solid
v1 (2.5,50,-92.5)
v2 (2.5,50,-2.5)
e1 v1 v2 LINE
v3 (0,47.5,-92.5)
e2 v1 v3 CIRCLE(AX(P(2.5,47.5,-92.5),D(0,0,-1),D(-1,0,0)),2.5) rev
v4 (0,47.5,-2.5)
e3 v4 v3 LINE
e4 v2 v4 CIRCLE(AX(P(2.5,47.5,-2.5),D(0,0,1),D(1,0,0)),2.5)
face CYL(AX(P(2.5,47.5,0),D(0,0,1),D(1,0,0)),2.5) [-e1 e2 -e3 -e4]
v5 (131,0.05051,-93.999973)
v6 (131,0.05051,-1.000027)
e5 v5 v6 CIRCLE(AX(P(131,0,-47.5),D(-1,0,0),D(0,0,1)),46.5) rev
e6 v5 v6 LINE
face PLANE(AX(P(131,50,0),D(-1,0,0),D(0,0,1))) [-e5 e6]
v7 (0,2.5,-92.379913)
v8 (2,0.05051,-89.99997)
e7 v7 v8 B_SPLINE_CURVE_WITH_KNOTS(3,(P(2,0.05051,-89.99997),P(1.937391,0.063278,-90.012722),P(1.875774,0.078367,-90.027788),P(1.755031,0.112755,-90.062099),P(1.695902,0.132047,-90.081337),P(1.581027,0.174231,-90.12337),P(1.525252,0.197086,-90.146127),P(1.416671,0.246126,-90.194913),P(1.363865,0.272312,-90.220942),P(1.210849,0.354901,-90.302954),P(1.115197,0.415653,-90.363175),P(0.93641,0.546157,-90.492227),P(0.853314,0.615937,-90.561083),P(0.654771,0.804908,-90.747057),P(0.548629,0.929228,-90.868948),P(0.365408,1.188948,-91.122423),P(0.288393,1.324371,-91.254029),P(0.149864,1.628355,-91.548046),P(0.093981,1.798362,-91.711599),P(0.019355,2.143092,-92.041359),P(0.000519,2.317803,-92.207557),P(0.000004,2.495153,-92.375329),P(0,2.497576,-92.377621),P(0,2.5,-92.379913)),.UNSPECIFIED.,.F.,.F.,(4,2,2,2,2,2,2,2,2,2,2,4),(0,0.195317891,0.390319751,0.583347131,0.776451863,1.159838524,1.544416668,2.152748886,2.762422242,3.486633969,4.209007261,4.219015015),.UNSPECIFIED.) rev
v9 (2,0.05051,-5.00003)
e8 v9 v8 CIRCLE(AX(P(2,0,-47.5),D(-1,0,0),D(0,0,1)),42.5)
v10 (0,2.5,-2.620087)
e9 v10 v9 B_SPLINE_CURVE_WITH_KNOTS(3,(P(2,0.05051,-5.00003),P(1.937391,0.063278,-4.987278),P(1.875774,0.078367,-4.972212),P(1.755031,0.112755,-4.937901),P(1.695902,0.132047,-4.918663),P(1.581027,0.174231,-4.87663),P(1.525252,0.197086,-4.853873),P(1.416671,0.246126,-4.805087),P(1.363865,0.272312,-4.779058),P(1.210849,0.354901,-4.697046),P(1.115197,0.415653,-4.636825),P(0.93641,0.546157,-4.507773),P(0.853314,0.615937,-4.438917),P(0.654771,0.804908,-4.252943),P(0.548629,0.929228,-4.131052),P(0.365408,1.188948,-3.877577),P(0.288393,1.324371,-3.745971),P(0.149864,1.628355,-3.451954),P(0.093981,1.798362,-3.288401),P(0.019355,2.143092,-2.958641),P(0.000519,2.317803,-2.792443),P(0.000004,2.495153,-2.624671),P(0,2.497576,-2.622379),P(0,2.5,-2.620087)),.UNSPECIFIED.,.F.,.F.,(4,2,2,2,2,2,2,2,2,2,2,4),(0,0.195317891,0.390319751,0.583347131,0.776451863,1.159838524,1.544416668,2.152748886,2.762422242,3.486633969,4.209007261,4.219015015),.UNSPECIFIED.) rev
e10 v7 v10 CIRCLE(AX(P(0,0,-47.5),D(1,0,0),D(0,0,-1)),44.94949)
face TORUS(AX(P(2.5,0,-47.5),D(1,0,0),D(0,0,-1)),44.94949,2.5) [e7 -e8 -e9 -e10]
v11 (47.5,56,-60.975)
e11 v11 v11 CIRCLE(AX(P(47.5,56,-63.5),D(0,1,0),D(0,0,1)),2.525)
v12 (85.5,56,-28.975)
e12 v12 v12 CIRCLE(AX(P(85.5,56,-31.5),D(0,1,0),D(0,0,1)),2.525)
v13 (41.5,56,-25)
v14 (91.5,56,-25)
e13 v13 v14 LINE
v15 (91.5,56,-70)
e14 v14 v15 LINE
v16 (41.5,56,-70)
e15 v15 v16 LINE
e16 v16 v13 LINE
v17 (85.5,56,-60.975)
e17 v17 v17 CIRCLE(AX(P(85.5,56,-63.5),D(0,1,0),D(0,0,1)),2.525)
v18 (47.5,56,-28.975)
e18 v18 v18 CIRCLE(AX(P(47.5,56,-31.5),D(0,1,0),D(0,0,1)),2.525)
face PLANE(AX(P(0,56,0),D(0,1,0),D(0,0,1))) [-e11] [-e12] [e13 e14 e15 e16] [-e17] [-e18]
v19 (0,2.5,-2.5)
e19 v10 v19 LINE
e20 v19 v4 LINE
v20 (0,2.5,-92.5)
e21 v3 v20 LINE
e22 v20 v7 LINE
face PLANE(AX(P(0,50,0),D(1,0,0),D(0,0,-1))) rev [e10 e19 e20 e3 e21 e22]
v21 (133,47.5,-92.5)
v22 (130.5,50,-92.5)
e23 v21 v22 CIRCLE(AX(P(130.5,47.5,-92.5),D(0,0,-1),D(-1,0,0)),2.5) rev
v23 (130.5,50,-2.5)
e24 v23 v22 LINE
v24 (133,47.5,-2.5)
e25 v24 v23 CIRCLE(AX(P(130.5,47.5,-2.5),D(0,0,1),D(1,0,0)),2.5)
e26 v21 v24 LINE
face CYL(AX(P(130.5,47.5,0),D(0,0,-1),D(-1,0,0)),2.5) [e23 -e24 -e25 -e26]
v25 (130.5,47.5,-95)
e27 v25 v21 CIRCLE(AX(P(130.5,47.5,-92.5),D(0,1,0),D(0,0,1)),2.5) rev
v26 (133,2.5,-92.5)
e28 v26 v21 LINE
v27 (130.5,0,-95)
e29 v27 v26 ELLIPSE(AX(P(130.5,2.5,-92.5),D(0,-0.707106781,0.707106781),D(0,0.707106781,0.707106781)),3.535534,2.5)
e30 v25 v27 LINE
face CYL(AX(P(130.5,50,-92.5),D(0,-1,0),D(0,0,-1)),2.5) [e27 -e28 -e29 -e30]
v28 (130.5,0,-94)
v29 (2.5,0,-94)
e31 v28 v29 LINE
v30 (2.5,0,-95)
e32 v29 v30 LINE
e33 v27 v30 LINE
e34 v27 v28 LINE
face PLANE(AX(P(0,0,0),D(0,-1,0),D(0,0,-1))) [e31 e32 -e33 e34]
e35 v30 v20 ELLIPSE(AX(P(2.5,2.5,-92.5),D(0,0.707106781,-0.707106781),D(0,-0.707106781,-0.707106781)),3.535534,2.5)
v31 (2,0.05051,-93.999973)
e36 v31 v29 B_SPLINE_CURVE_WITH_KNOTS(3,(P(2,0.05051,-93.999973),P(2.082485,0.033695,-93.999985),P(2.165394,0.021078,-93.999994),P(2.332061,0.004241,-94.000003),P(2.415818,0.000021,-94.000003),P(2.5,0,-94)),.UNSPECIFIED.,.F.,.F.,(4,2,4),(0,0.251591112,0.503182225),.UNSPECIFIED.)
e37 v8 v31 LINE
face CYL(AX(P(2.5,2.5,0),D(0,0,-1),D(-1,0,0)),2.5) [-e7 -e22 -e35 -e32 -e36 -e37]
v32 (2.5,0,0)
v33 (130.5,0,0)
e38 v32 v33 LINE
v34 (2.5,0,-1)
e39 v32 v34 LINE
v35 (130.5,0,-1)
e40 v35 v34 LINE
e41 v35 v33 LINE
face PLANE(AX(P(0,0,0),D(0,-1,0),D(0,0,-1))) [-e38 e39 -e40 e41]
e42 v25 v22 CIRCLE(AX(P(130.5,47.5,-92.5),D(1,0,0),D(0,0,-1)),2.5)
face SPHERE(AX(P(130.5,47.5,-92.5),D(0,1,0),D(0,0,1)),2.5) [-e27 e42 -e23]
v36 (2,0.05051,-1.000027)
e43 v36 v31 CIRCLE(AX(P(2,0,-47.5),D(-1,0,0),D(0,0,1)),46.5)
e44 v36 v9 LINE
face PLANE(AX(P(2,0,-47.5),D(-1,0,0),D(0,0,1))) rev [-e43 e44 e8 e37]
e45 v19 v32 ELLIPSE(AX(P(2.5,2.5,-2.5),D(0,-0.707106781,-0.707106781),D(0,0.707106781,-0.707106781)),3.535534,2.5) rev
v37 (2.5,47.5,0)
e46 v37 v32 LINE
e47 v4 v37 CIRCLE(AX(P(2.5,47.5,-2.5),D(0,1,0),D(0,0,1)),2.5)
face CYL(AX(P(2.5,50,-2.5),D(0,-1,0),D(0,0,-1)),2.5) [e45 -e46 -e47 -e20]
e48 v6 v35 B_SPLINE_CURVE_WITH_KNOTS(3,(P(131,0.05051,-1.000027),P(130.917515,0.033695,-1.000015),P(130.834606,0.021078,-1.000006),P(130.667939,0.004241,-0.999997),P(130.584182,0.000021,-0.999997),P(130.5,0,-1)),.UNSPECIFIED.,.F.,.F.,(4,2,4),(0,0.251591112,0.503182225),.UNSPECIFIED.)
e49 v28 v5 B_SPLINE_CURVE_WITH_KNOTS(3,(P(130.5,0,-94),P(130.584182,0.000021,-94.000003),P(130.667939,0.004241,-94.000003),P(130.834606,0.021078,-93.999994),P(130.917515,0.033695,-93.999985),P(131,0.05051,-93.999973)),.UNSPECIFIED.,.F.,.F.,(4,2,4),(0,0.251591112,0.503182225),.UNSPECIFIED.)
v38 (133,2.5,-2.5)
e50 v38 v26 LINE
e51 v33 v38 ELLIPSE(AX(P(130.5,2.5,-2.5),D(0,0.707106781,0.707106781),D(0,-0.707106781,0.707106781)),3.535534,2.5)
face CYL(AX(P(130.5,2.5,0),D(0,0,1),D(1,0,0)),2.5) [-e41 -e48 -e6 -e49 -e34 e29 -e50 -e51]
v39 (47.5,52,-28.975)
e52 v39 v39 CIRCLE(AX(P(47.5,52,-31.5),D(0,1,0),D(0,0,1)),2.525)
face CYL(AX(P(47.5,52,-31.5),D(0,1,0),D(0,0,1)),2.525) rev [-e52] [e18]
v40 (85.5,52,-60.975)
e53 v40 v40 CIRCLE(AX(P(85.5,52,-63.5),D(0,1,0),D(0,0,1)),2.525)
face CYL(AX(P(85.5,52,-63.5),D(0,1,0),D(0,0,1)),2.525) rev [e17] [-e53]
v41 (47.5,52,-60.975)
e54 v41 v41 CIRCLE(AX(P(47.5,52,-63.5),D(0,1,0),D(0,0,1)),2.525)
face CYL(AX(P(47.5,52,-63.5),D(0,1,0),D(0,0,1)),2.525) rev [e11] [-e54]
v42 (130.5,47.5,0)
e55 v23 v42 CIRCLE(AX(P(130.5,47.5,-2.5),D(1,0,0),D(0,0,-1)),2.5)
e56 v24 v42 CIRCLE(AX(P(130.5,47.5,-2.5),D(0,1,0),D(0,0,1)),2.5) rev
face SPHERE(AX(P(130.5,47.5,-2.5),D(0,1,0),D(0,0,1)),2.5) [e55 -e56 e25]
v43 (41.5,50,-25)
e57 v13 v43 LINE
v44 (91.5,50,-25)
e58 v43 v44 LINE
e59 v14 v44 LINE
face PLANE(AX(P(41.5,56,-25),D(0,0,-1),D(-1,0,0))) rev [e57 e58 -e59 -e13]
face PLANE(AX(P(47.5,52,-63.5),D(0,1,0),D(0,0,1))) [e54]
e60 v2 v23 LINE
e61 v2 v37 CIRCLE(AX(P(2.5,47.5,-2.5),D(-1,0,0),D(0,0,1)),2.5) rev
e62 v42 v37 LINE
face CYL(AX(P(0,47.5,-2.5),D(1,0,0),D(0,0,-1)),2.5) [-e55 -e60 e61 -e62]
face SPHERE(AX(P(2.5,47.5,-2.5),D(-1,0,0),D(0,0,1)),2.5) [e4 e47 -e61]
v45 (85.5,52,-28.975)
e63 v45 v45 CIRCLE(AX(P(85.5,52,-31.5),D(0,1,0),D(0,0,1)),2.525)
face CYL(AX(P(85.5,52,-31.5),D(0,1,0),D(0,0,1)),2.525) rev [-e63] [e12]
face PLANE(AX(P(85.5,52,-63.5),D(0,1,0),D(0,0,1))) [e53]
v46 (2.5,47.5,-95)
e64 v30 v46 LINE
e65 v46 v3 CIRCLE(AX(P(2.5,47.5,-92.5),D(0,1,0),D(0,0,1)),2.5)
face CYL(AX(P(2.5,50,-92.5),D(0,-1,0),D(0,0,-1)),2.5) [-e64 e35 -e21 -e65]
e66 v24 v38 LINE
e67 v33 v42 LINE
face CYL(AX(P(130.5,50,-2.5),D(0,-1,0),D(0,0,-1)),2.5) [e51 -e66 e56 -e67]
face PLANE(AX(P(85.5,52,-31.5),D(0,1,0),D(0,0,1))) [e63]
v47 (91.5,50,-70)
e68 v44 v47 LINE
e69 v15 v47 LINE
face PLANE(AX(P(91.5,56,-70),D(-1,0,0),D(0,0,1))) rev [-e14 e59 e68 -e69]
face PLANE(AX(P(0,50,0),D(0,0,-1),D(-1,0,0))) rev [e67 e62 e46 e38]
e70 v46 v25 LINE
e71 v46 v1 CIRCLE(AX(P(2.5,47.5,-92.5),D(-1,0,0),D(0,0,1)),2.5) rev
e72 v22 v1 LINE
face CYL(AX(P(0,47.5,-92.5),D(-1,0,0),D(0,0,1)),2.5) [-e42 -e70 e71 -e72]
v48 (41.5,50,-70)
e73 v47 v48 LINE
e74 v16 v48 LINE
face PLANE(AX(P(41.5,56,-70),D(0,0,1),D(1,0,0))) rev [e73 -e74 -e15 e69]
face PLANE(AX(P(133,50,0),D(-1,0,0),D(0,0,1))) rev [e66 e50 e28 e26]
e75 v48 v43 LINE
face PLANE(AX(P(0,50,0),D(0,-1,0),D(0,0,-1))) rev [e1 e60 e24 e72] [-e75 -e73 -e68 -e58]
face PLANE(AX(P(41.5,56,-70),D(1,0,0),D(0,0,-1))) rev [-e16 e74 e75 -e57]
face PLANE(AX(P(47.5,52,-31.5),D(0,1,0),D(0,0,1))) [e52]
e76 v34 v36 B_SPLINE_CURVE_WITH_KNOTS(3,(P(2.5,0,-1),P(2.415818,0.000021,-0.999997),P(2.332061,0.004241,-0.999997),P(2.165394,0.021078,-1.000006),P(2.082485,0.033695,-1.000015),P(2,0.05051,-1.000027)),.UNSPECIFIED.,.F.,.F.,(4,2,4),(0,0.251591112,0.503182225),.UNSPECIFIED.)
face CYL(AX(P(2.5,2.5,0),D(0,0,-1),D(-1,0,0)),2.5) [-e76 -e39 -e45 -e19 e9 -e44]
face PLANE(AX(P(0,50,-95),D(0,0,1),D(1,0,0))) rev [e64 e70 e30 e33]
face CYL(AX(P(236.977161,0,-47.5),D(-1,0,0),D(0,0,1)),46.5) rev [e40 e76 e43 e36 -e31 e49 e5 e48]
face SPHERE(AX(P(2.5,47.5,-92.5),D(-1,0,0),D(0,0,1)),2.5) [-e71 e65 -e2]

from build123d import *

# Parameters (mm, degrees)
SKETCH1_W           = 133
SKETCH1_H           = 95
BOSS_EXTRUDE1_DEPTH = 50
CUT_EXTRUDE1_START  = -2
CUT_EXTRUDE1_DEPTH  = 129
SKETCH3_R           = 42.5
CUT_EXTRUDE2_DEPTH  = 10
FILLET1_R           = 2.5
SKETCH4_W           = 50
SKETCH4_H           = 45
BOSS_EXTRUDE2_DEPTH = 6
SKETCH5_R           = 2.525
CUT_EXTRUDE3_DEPTH  = 4


with BuildPart() as part:
    # Sketch1 → Boss-Extrude1 (new body)
    with BuildSketch(Plane(origin=(0, 0, 0), x_dir=(1, 0, 0), z_dir=(0, 1, 0))):
        with Locations((66.5, 47.5)):
            Rectangle(SKETCH1_W, SKETCH1_H)
    extrude(amount=BOSS_EXTRUDE1_DEPTH)

    # Sketch2 → Cut-Extrude1 (cut)
    with BuildSketch(Plane.ZY.offset(CUT_EXTRUDE1_START)):
        with BuildLine():
            Line((-94, 0), (-1, 0))
            ThreePointArc((-1, 0), (-47.5, 46.5), (-94, 0))
        make_face()
    extrude(amount=-CUT_EXTRUDE1_DEPTH, mode=Mode.SUBTRACT)

    # Sketch3 → Cut-Extrude2 (cut)
    with BuildSketch(Plane.ZY):
        with Locations((-47.5, 0)):
            Circle(SKETCH3_R)
    extrude(amount=-CUT_EXTRUDE2_DEPTH, mode=Mode.SUBTRACT)

    # Fillet1
    # the kernel refuses this fillet: 2.5 mm, written as the material it takes off along each edge
    with BuildSketch(Plane(origin=(130.5, 47.5, -92.5), x_dir=(0, 1, 0), z_dir=(1, 0, 0))) as fillet1_piece_1_section:
        Polygon((0, 0), (FILLET1_R * 1.02, 0), (FILLET1_R * 1.02, -FILLET1_R * 1.02), (0, -FILLET1_R * 1.02), align=None)
    fillet1_piece_1 = extrude(amount=FILLET1_R * 1.02, mode=Mode.PRIVATE)
    fillet1_piece_1 = fillet1_piece_1 - Plane(origin=(130.5, 47.5, -92.5), x_dir=(0, -0.7071067811865475, 0.7071067811865475), z_dir=(1, 0, 0)) * Sphere(FILLET1_R, mode=Mode.PRIVATE)
    add(fillet1_piece_1, mode=Mode.SUBTRACT)
    with BuildSketch(Plane(origin=(2.5, 47.5, -92.5), x_dir=(0, 1, 0), z_dir=(-1, 0, 0))) as fillet1_piece_2_section:
        Polygon((0, 0), (FILLET1_R * 1.02, 0), (FILLET1_R * 1.02, FILLET1_R * 1.02), (0, FILLET1_R * 1.02), align=None)
    fillet1_piece_2 = extrude(amount=FILLET1_R * 1.02, mode=Mode.PRIVATE)
    fillet1_piece_2 = fillet1_piece_2 - Plane(origin=(2.5, 47.5, -92.5), x_dir=(0, -0.7071067811865475, 0.7071067811865475), z_dir=(-1, 0, 0)) * Sphere(FILLET1_R, mode=Mode.PRIVATE)
    add(fillet1_piece_2, mode=Mode.SUBTRACT)
    with BuildSketch(Plane(origin=(130.5, 47.5, -2.5), x_dir=(1, 0, 0), z_dir=(0, 0, 1))) as fillet1_piece_3_section:
        Polygon((0, 0), (FILLET1_R * 1.02, 0), (FILLET1_R * 1.02, FILLET1_R * 1.02), (0, FILLET1_R * 1.02), align=None)
    fillet1_piece_3 = extrude(amount=FILLET1_R * 1.02, mode=Mode.PRIVATE)
    fillet1_piece_3 = fillet1_piece_3 - Plane(origin=(130.5, 47.5, -2.5), x_dir=(-0.7071067811865475, -0.7071067811865475, 0), z_dir=(0, 0, 1)) * Sphere(FILLET1_R, mode=Mode.PRIVATE)
    add(fillet1_piece_3, mode=Mode.SUBTRACT)
    with BuildSketch(Plane(origin=(2.5, 47.5, -2.5), x_dir=(-1, 0, 0), z_dir=(0, 0, 1))) as fillet1_piece_4_section:
        Polygon((0, 0), (FILLET1_R * 1.02, 0), (FILLET1_R * 1.02, -FILLET1_R * 1.02), (0, -FILLET1_R * 1.02), align=None)
    fillet1_piece_4 = extrude(amount=FILLET1_R * 1.02, mode=Mode.PRIVATE)
    fillet1_piece_4 = fillet1_piece_4 - Plane(origin=(2.5, 47.5, -2.5), x_dir=(0.7071067811865475, -0.7071067811865475, 0), z_dir=(0, 0, 1)) * Sphere(FILLET1_R, mode=Mode.PRIVATE)
    add(fillet1_piece_4, mode=Mode.SUBTRACT)
    with BuildSketch(Plane(origin=(130.5, 50, -95), x_dir=(0, 0, 1), z_dir=(-1, 0, 0))) as fillet1_piece_5:
        with BuildLine():
            CenterArc((FILLET1_R, -FILLET1_R), FILLET1_R, 90, 90)
            Line((0, -FILLET1_R), (0, 0))
            Line((0, 0), (FILLET1_R, 0))
        make_face()
    extrude(amount=128, mode=Mode.SUBTRACT)
    with BuildSketch(Plane(origin=(133, 50, -2.5), x_dir=(0, -1, 0), z_dir=(0, 0, -1)), Plane(origin=(0, 50, -92.5), x_dir=(0, -1, 0), z_dir=(0, 0, 1))) as fillet1_piece_6:
        with BuildLine():
            CenterArc((FILLET1_R, FILLET1_R), FILLET1_R, 180, 90)
            Line((0, FILLET1_R), (0, 0))
            Line((0, 0), (FILLET1_R, 0))
        make_face()
    extrude(amount=90, mode=Mode.SUBTRACT)
    with BuildSketch(Plane(origin=(2.5, 50, 0), x_dir=(0, -1, 0), z_dir=(1, 0, 0))) as fillet1_piece_7:
        with BuildLine():
            CenterArc((FILLET1_R, FILLET1_R), FILLET1_R, 180, 90)
            Line((0, FILLET1_R), (0, 0))
            Line((0, 0), (FILLET1_R, 0))
        make_face()
    extrude(amount=128, mode=Mode.SUBTRACT)
    with BuildSketch(Plane(origin=(133, -6.25, 0), x_dir=(-1, 0, 0), z_dir=(0, 1, 0)), Plane(origin=(133, -6.25, -95), x_dir=(0, 0, 1), z_dir=(0, 1, 0))) as fillet1_piece_8:
        with BuildLine():
            CenterArc((FILLET1_R, -FILLET1_R), FILLET1_R, 90, 90)
            Line((0, -FILLET1_R), (0, 0))
            Line((0, 0), (FILLET1_R, 0))
        make_face()
    extrude(amount=53.75, mode=Mode.SUBTRACT)
    with BuildSketch(Plane(origin=(133, 0, 6.25), x_dir=(0, 1, 0), z_dir=(0, 0, -1))) as fillet1_piece_9:
        with BuildLine():
            CenterArc((FILLET1_R, -FILLET1_R), FILLET1_R, 90, 90)
            Line((0, -FILLET1_R), (0, 0))
            Line((0, 0), (FILLET1_R, 0))
        make_face()
    extrude(amount=107.5, mode=Mode.SUBTRACT)
    with BuildSketch(Plane(origin=(0, -6.25, -95), x_dir=(0, 0, 1), z_dir=(0, 1, 0)), Plane(origin=(0, -6.25, 0), x_dir=(1, 0, 0), z_dir=(0, 1, 0))) as fillet1_piece_10:
        with BuildLine():
            CenterArc((FILLET1_R, FILLET1_R), FILLET1_R, 180, 90)
            Line((0, FILLET1_R), (0, 0))
            Line((0, 0), (FILLET1_R, 0))
        make_face()
    extrude(amount=53.75, mode=Mode.SUBTRACT)
    with BuildSketch(Plane(origin=(0, 0, -11.25), x_dir=(0, 1, 0), z_dir=(0, 0, 1)), Plane(origin=(0, 0, -101.25), x_dir=(0, 1, 0), z_dir=(0, 0, 1))) as fillet1_piece_11:
        with BuildLine():
            CenterArc((FILLET1_R, -FILLET1_R), FILLET1_R, 90, 90)
            Line((0, -FILLET1_R), (0, 0))
            Line((0, 0), (FILLET1_R, 0))
        make_face()
    extrude(amount=17.5, mode=Mode.SUBTRACT)
    with BuildSketch(Plane(origin=(0, 0, -47.5), x_dir=(0, -0.14381889116089108, 0.9896040251258338), z_dir=(0, -0.9896040251258338, -0.14381889116089108))) as fillet1_piece_12:
        with BuildLine():
            CenterArc((44.949489743, -2.5), FILLET1_R, 90, 78.463040967)
            Line((42.5, -2), (42.5, 0))
            Line((42.5, 0), (44.949489743, 0))
        make_face()
    revolve(axis=Axis((0, 0, -47.5), (-1, 0, 0)), revolution_arc=196.537779553, mode=Mode.SUBTRACT)

    # Sketch4 → Boss-Extrude2 (add)
    with BuildSketch(Plane(origin=(0, 50, 0), x_dir=(1, 0, 0), z_dir=(0, 1, 0))):
        with Locations((66.5, 47.5)):
            Rectangle(SKETCH4_W, SKETCH4_H)
    extrude(amount=BOSS_EXTRUDE2_DEPTH)

    # Sketch5 → Cut-Extrude3 (cut)
    with BuildSketch(Plane(origin=(0, 56, 0), x_dir=(1, 0, 0), z_dir=(0, 1, 0))):
        with Locations(Location((47.5, 63.5, 0), (0, 0, 270))):
            Circle(SKETCH5_R)
        with Locations(Location((85.5, 63.5, 0), (0, 0, 270))):
            Circle(SKETCH5_R)
        with Locations(Location((85.5, 31.5, 0), (0, 0, 270))):
            Circle(SKETCH5_R)
        with Locations(Location((47.5, 31.5, 0), (0, 0, 270))):
            Circle(SKETCH5_R)
    extrude(amount=-CUT_EXTRUDE3_DEPTH, mode=Mode.SUBTRACT)


solid = part.part
